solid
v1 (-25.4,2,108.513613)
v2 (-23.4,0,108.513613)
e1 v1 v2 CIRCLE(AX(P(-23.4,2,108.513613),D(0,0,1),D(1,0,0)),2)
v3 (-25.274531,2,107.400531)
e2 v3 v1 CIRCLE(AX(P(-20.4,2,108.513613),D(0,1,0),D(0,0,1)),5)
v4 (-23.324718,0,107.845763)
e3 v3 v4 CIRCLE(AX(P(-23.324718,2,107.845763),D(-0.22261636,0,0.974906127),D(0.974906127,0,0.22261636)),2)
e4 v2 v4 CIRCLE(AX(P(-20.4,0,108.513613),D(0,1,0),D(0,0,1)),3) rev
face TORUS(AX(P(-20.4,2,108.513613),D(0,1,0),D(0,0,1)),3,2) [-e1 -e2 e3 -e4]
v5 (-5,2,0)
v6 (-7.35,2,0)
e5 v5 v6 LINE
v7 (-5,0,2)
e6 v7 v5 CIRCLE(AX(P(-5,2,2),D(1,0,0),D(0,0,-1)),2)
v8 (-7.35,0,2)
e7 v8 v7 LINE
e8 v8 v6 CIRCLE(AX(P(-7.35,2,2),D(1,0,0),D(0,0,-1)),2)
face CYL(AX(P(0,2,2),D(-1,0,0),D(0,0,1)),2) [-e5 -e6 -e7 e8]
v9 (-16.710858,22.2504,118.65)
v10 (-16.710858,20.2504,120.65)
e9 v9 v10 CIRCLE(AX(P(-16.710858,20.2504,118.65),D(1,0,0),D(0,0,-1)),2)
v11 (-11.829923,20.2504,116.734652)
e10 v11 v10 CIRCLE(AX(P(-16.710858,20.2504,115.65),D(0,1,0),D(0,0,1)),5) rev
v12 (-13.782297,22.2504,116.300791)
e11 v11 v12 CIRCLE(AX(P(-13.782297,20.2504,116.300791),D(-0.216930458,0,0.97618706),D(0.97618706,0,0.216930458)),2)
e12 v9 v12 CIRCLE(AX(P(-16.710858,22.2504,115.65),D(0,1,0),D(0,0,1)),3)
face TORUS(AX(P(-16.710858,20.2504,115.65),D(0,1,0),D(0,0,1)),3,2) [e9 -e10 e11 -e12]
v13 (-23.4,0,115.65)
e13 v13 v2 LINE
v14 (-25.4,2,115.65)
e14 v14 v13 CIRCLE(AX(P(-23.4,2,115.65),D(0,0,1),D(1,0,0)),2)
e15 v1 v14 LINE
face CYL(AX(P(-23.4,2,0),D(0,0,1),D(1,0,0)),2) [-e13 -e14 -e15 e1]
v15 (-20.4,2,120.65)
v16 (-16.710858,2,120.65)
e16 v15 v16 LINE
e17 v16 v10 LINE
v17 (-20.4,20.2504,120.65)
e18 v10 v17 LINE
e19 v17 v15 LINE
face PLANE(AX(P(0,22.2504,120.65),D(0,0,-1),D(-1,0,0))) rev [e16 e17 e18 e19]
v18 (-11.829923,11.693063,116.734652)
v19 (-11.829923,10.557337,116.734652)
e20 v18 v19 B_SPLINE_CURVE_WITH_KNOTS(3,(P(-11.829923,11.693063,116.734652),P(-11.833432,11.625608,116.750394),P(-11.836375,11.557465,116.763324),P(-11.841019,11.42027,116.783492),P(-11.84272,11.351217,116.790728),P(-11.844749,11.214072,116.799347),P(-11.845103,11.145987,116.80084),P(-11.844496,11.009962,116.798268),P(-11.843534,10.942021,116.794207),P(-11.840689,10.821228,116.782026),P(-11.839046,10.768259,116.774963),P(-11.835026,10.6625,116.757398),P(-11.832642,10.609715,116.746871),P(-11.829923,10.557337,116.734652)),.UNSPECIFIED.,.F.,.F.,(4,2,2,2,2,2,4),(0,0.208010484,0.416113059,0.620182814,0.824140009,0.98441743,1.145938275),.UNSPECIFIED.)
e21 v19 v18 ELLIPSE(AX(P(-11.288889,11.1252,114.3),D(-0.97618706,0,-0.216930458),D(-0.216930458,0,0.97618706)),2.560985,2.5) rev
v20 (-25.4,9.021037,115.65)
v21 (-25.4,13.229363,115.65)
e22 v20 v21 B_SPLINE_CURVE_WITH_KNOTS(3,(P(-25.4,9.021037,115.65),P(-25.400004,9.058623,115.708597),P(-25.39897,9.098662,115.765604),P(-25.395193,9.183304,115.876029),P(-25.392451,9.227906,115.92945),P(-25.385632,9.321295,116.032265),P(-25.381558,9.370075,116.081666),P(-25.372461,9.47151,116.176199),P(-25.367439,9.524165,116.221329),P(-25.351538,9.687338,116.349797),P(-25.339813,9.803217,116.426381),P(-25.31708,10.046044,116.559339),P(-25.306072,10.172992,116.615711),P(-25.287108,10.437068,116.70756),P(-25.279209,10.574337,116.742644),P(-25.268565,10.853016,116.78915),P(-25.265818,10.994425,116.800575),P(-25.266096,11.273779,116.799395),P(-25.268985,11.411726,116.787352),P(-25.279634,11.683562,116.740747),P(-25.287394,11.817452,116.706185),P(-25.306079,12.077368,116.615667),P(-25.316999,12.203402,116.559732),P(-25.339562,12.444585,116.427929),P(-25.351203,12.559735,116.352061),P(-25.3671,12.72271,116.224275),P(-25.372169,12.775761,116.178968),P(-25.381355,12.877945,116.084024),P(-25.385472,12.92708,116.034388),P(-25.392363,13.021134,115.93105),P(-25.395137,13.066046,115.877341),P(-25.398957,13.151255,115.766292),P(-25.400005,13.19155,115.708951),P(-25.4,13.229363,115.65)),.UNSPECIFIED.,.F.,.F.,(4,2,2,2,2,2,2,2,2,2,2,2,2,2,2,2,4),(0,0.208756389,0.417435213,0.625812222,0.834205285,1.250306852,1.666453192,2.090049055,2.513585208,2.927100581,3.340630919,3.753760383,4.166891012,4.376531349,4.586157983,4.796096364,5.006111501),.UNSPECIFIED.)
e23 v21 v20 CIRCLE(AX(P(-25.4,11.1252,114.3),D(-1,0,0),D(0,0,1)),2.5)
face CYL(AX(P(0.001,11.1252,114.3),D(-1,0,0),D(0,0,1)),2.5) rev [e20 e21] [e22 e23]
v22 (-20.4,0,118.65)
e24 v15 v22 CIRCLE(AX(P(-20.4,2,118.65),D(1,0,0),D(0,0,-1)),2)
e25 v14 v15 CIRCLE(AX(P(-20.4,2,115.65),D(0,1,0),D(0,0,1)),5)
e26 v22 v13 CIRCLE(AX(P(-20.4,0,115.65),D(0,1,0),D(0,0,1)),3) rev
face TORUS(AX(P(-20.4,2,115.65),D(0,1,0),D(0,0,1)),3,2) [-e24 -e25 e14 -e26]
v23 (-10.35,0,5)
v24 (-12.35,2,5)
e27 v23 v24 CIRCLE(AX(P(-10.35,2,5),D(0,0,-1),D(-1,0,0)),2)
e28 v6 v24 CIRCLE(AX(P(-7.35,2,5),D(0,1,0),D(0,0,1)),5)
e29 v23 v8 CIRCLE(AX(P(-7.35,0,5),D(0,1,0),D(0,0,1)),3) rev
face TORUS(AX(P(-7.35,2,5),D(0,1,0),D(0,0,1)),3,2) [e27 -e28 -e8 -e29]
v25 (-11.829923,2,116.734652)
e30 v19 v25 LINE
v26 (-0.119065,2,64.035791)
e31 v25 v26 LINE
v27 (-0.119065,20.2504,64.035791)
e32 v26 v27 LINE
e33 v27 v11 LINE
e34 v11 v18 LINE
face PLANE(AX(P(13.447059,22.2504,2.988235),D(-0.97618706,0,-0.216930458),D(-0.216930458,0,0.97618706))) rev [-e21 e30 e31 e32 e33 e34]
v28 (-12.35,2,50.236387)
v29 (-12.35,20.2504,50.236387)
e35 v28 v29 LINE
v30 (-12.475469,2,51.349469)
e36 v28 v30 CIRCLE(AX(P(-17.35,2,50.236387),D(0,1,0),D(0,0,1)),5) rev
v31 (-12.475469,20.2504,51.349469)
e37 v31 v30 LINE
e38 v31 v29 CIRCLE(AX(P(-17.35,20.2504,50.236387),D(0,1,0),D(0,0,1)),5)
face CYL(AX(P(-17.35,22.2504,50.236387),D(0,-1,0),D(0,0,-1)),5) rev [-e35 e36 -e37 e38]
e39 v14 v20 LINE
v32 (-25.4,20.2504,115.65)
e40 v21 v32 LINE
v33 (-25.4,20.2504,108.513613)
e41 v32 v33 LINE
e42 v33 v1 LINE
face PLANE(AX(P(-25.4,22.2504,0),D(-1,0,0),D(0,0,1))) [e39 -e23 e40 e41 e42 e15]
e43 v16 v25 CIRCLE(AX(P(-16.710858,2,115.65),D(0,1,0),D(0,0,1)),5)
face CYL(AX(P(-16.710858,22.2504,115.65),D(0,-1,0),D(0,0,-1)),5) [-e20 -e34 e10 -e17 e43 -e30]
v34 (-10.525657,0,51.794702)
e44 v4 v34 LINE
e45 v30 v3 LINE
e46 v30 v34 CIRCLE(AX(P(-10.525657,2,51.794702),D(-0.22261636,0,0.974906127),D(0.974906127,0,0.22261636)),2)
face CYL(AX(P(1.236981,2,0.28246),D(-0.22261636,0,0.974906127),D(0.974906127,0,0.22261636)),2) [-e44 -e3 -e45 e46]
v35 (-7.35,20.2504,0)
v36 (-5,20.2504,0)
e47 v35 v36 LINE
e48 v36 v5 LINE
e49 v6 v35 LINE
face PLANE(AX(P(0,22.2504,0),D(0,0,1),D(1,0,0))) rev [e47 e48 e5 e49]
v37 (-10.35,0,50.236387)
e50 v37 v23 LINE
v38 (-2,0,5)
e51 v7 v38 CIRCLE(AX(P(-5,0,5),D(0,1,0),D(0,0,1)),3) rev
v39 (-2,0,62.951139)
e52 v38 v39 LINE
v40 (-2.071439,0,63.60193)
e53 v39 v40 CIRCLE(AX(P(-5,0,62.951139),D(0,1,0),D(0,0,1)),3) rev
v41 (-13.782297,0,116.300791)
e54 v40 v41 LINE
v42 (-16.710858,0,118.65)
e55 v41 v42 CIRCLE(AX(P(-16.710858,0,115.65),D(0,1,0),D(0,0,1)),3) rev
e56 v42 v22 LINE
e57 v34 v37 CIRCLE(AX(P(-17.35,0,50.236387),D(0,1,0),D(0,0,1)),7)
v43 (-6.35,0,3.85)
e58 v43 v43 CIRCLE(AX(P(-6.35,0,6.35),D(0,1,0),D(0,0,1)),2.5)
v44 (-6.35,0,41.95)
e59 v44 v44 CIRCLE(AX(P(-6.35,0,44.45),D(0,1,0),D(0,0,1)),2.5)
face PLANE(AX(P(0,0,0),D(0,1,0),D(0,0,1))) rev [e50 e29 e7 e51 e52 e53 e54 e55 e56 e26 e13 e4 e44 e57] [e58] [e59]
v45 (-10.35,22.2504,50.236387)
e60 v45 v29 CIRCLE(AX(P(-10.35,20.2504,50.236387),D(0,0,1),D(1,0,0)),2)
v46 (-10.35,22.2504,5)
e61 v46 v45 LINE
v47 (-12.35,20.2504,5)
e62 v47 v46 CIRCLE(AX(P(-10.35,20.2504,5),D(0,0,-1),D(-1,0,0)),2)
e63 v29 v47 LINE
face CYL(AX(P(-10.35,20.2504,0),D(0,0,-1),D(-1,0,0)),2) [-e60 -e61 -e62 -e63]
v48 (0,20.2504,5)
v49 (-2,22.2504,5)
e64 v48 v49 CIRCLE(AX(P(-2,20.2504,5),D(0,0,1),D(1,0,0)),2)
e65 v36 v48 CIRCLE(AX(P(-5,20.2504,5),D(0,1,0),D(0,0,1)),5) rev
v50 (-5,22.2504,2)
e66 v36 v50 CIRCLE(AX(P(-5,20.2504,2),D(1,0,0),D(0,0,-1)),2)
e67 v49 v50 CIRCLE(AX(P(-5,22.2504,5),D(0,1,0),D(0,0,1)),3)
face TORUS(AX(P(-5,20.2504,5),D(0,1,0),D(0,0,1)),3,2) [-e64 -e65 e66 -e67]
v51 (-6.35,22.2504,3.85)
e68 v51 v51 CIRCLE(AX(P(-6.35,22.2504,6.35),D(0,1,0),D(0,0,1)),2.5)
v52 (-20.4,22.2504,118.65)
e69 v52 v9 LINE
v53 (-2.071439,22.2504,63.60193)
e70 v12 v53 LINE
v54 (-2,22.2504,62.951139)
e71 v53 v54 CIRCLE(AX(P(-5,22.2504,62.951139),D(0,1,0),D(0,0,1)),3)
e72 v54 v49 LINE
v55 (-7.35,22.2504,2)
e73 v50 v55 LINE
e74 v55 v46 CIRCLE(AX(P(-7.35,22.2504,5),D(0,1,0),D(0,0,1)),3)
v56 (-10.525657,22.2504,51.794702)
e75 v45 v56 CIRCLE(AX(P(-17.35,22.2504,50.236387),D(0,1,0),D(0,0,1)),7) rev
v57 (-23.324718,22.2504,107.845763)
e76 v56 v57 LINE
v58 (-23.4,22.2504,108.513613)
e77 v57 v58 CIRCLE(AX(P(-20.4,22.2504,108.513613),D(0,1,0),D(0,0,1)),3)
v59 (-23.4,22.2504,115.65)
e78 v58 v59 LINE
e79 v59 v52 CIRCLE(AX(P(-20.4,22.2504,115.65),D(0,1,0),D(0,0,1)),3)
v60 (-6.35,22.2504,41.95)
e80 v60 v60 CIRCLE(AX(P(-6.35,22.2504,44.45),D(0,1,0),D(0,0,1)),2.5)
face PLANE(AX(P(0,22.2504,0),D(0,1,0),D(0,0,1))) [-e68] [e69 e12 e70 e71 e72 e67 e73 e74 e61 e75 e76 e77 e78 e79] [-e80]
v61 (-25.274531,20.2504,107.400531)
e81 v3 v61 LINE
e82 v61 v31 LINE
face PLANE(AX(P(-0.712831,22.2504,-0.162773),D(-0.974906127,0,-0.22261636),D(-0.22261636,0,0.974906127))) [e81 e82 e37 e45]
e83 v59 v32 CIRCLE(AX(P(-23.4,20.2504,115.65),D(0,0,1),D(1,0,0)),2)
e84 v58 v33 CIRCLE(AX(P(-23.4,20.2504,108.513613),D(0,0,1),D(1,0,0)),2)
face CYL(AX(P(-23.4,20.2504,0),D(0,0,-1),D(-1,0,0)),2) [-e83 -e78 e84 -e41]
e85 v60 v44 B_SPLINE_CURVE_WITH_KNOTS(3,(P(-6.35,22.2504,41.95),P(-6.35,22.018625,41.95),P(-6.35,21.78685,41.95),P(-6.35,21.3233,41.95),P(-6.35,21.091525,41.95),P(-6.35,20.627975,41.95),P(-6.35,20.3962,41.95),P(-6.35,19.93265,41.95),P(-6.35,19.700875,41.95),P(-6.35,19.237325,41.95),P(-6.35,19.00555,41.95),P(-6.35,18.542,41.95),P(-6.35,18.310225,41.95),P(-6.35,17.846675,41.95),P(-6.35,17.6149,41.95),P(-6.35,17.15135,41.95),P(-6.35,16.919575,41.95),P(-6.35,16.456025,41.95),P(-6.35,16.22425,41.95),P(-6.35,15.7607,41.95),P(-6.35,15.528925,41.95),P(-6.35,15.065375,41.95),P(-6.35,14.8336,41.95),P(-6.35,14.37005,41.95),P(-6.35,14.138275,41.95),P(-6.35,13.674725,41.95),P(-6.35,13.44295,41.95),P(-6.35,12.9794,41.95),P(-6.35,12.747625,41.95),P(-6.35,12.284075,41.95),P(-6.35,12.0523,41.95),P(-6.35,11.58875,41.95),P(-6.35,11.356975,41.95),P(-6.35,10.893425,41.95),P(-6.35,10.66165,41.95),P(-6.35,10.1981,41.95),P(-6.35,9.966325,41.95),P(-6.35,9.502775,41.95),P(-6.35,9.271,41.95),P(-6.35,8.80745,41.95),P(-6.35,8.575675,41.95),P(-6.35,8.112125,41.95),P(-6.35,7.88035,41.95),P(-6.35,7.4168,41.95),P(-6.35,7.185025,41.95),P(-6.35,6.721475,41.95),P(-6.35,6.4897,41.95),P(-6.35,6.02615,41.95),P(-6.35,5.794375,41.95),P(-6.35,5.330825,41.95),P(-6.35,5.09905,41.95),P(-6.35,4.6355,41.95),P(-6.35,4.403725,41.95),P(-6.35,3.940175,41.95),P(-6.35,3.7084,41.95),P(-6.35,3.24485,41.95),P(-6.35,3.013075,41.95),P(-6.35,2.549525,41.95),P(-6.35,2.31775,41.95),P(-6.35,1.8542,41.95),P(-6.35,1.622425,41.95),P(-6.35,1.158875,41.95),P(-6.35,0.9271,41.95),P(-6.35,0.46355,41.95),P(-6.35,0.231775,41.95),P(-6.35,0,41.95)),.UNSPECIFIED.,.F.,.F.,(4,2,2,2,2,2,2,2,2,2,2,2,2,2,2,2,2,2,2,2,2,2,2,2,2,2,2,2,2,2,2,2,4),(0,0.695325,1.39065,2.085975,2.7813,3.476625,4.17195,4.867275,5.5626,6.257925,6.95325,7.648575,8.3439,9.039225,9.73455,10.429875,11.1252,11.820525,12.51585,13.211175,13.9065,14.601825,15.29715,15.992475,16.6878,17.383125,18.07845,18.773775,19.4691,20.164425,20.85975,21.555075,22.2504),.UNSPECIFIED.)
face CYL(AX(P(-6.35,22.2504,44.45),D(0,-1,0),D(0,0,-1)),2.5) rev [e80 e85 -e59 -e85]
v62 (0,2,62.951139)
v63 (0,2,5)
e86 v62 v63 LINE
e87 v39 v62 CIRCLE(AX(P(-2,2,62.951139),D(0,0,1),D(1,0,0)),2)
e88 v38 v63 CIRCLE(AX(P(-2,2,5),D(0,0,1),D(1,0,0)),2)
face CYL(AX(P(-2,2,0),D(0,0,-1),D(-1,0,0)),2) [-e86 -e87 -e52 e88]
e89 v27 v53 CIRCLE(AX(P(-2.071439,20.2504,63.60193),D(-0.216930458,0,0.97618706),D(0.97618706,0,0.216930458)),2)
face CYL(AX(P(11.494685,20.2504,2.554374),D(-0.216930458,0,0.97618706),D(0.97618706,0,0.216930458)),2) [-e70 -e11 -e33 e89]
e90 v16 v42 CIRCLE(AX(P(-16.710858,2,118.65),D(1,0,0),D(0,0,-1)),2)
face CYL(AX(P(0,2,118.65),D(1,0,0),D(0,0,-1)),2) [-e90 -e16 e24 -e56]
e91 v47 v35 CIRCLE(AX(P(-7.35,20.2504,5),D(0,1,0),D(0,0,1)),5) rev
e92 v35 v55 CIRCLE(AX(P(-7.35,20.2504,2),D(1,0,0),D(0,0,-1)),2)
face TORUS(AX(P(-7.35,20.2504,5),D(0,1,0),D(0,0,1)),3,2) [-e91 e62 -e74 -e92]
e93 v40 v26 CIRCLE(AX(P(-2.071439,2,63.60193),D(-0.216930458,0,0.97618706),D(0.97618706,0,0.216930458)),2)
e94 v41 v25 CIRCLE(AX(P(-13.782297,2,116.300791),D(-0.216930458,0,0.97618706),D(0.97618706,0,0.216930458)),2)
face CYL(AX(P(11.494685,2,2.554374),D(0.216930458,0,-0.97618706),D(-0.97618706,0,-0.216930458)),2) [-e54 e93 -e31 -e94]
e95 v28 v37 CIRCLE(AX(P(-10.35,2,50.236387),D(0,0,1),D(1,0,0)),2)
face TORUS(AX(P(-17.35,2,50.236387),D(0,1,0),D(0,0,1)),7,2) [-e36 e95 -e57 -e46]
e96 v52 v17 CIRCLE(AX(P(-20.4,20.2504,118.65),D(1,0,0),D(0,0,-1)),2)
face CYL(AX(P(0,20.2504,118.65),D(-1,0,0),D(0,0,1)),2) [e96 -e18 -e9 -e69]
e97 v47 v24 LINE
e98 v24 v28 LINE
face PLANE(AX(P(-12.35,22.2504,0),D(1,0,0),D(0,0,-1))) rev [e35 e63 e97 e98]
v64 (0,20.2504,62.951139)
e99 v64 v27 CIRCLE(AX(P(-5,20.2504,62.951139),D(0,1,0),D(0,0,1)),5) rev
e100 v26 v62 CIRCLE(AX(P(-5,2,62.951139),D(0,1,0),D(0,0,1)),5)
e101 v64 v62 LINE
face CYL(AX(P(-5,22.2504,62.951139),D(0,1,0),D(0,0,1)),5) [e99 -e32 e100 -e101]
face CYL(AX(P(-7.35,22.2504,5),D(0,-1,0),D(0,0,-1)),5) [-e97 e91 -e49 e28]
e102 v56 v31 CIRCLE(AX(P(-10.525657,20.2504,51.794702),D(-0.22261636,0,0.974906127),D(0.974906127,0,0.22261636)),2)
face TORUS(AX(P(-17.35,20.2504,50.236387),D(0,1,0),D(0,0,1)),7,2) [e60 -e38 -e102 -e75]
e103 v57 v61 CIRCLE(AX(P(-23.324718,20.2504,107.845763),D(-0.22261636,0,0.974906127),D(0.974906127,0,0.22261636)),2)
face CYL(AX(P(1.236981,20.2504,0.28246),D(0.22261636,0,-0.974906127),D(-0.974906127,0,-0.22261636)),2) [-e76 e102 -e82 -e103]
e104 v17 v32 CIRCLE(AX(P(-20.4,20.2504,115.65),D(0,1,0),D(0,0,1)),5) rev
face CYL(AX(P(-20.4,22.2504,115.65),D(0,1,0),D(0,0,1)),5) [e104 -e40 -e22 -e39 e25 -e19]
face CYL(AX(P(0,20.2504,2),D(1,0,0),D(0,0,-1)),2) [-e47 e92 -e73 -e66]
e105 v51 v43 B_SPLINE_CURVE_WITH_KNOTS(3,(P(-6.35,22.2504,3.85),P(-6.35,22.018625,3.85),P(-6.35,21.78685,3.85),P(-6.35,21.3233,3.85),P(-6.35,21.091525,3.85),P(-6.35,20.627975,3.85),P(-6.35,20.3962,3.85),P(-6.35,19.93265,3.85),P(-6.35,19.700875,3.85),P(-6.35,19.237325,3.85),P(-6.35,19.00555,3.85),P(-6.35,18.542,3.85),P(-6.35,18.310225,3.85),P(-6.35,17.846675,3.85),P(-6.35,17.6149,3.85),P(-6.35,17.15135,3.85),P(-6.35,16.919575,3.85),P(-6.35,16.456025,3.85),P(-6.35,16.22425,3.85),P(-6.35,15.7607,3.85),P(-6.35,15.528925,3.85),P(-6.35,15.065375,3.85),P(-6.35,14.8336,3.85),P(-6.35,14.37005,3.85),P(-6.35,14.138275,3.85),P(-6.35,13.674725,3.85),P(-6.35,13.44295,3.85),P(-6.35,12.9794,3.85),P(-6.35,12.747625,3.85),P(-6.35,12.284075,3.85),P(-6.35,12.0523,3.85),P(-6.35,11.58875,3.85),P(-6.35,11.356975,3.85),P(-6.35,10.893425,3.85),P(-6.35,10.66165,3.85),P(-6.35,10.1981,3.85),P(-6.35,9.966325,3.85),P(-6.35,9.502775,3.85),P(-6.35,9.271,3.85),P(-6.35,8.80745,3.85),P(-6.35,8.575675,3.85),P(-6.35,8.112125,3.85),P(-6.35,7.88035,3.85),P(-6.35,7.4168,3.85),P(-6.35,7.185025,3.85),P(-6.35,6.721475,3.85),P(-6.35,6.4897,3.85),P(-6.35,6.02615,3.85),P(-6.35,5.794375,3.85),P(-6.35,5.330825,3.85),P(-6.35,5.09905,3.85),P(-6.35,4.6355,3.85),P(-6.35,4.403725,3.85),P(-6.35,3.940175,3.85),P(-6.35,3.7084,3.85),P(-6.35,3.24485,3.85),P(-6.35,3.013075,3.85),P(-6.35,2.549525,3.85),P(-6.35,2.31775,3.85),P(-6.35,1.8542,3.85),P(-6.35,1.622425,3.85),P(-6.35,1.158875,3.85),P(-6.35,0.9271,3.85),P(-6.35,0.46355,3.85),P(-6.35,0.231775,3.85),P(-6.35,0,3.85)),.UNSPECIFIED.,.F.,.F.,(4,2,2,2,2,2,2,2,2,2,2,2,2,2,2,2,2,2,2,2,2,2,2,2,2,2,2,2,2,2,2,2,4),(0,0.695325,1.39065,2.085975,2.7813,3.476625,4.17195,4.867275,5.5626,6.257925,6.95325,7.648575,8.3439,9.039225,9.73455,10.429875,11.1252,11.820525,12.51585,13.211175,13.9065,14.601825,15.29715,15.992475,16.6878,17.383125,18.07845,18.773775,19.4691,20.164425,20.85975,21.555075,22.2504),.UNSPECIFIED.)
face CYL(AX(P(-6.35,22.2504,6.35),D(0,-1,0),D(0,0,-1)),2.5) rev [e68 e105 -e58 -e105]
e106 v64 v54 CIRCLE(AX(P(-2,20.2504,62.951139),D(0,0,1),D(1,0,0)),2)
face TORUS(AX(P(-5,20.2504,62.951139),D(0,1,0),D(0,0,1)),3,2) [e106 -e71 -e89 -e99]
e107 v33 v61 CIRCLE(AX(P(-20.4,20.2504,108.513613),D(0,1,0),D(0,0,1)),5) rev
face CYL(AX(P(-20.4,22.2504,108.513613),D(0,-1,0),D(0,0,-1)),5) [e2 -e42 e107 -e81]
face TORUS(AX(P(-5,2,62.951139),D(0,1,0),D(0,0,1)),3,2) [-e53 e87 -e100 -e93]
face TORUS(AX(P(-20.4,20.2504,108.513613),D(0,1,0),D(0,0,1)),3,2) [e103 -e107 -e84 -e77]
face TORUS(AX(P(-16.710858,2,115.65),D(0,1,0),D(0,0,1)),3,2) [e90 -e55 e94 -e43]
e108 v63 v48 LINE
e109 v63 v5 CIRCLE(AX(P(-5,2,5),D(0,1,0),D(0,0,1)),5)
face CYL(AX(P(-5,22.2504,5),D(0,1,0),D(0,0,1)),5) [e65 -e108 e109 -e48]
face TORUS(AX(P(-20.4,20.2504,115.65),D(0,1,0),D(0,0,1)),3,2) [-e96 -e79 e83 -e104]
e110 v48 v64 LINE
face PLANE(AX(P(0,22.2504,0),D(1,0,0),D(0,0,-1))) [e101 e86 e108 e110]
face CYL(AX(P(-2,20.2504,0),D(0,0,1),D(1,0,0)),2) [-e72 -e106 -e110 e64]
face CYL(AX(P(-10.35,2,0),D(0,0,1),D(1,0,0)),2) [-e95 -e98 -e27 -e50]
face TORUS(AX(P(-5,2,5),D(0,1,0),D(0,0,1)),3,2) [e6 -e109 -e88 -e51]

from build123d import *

# Parameters (mm, degrees)
SKETCH2_R           = 2.5
BOSS_EXTRUDE1_DEPTH = 22.2504
CUT_EXTRUDE1_REACH  = 127.286
SKETCH3_R           = 2.5
FILLET2_R           = 5
FILLET3_R           = 2


with BuildPart() as part:
    # Sketch2 → Boss-Extrude1 (new body)
    with BuildSketch(Plane(origin=(0, 0, 0), x_dir=(1, 0, 0), z_dir=(0, 1, 0))):
        Polygon((-25.4, -107.95), (-12.35, -50.8), (-12.35, 0), (0, 0), (0, -63.5), (-12.7, -120.65), (-25.4, -120.65), align=None)
        with Locations(Location((-6.35, -44.45, 0), (0, 0, 90))):
            Circle(SKETCH2_R, mode=Mode.SUBTRACT)
        with Locations(Location((-6.35, -6.35, 0), (0, 0, 90))):
            Circle(SKETCH2_R, mode=Mode.SUBTRACT)
    extrude(amount=BOSS_EXTRUDE1_DEPTH)

    # Cut-Extrude1: up to this plane
    cut_extrude1_end = Plane(origin=(13.447058824, 22.2504, 2.988235294), z_dir=(-0.9761870601839527, 0, -0.21693045781865627))
    # Sketch3 → Cut-Extrude1 (cut, up to the surface)
    with BuildSketch(Plane.ZY.offset(25.4), mode=Mode.PRIVATE) as cut_extrude1_sk1:
        with Locations((114.3, 11.1252)):
            Circle(SKETCH3_R)
    cut_extrude1_tool1 = split(extrude(cut_extrude1_sk1.sketch, amount=-CUT_EXTRUDE1_REACH, mode=Mode.PRIVATE), bisect_by=cut_extrude1_end, keep=Keep.BOTH, mode=Mode.PRIVATE)
    add(cut_extrude1_tool1.solids().sort_by_distance((-25.4, 11.1252, 114.3))[0], mode=Mode.SUBTRACT)

    # Fillet2
    # the kernel refuses this fillet: 5 mm, written as the material it adds along each edge
    with BuildSketch(Plane(origin=(-12.35, 0, 50.8), x_dir=(-0.22261635970063726, 0, 0.9749061269648666), z_dir=(0, 1, 0))) as fillet2_piece_1:
        with BuildLine():
            CenterArc((FILLET2_R * 0.112722501926, -FILLET2_R), FILLET2_R, 90, 12.862751019)
            Line((-FILLET2_R * 0.109893857775, -FILLET2_R * 0.0250938730351), (0, 0))
            Line((0, 0), (FILLET2_R * 0.112722501926, 0))
        make_face()
    extrude(amount=22.2504)
    # the kernel refuses this fillet: 5 mm, written as the material it takes off along each edge
    with BuildSketch(Plane(origin=(-12.35, -12.5, 0), x_dir=(0, 0, 1), z_dir=(0, 1, 0)), Plane(origin=(0, -12.5, 0), x_dir=(-1, 0, 0), z_dir=(0, 1, 0))) as fillet2_2_piece_1:
        with BuildLine():
            CenterArc((FILLET2_R, FILLET2_R), FILLET2_R, 180, 90)
            Line((0, FILLET2_R), (0, 0))
            Line((0, 0), (FILLET2_R, 0))
        make_face()
    extrude(amount=47.2504, mode=Mode.SUBTRACT)
    with BuildSketch(Plane(origin=(0, -1.372152858, 63.5), x_dir=(0, 0, -1), z_dir=(0, 1, 0))) as fillet2_2_piece_2:
        with BuildLine():
            CenterArc((FILLET2_R * 0.109772228646, FILLET2_R), FILLET2_R, 257.471192291, 12.528807709)
            Line((-FILLET2_R * 0.107158229172, FILLET2_R * 0.023812939816), (0, 0))
            Line((0, 0), (FILLET2_R * 0.109772228646, 0))
        make_face()
    extrude(amount=24.994705716, mode=Mode.SUBTRACT)
    with BuildSketch(Plane(origin=(-12.7, -10.02714508, 120.65), x_dir=(0.21693045781865597, 0, -0.9761870601839527), z_dir=(0, 1, 0))) as fillet2_2_piece_3:
        with BuildLine():
            CenterArc((FILLET2_R * 0.802171606366, FILLET2_R), FILLET2_R, 192.528807709, 77.471192291)
            Line((-FILLET2_R * 0.174015453818, FILLET2_R * 0.783069542181), (0, 0))
            Line((0, 0), (FILLET2_R * 0.802171606366, 0))
        make_face()
    extrude(amount=42.304690159, mode=Mode.SUBTRACT)
    with BuildSketch(Plane(origin=(-25.4, -12.5, 120.65), x_dir=(0, 0, -1), z_dir=(0, 1, 0))) as fillet2_2_piece_4:
        with BuildLine():
            CenterArc((FILLET2_R, -FILLET2_R), FILLET2_R, 90, 90)
            Line((0, -FILLET2_R), (0, 0))
            Line((0, 0), (FILLET2_R, 0))
        make_face()
    extrude(amount=47.2504, mode=Mode.SUBTRACT)
    with BuildSketch(Plane(origin=(-25.4, -1.409031274, 107.95), x_dir=(0.2226163597006375, 0, -0.9749061269648664), z_dir=(0, 1, 0))) as fillet2_2_piece_5:
        with BuildLine():
            CenterArc((FILLET2_R * 0.112722501926, -FILLET2_R), FILLET2_R, 90, 12.862751019)
            Line((-FILLET2_R * 0.109893857775, -FILLET2_R * 0.0250938730351), (0, 0))
            Line((0, 0), (FILLET2_R * 0.112722501926, 0))
        make_face()
    extrude(amount=25.068462548, mode=Mode.SUBTRACT)

    # Fillet3
    fillet3_edges = [part.edges().sort_by_distance(p)[0] for p in [
        (-6.175, 0, 0),
        (-6.175, 22.2504, 0),
        (-18.875, 0, 79.375),
        (-12.35, 0, 27.618193745),
        (0, 0, 33.975569428),
        (-5.974493715, 0, 90.385221717),
        (-18.555429016, 0, 120.65),
        (-25.4, 0, 112.081806255),
        (-13.582221064, 0, 119.550209061),
        (-23.935533906, 0, 119.185533906),
        (-25.368533646, 0, 107.953546966),
        (-10.885533906, 0, 1.464466094),
        (-0.029855309, 0, 63.496722716),
        (-1.464466094, 0, 1.464466094),
        (0, 22.2504, 33.975569428),
        (-18.875, 22.2504, 79.375),
        (-25.4, 22.2504, 112.081806255),
        (-18.555429016, 22.2504, 120.65),
        (-5.974493715, 22.2504, 90.385221717),
        (-12.35, 22.2504, 27.618193745),
        (-13.582221064, 22.2504, 119.550209061),
        (-23.935533906, 22.2504, 119.185533906),
        (-25.368533646, 22.2504, 107.953546966),
        (-10.885533906, 22.2504, 1.464466094),
        (-0.029855309, 22.2504, 63.496722716),
        (-1.464466094, 22.2504, 1.464466094),
        (-12.381466354, 0, 50.796453034),
        (-12.381466354, 22.2504, 50.796453034),
    ]]
    fillet(fillet3_edges, radius=FILLET3_R)


solid = part.part
